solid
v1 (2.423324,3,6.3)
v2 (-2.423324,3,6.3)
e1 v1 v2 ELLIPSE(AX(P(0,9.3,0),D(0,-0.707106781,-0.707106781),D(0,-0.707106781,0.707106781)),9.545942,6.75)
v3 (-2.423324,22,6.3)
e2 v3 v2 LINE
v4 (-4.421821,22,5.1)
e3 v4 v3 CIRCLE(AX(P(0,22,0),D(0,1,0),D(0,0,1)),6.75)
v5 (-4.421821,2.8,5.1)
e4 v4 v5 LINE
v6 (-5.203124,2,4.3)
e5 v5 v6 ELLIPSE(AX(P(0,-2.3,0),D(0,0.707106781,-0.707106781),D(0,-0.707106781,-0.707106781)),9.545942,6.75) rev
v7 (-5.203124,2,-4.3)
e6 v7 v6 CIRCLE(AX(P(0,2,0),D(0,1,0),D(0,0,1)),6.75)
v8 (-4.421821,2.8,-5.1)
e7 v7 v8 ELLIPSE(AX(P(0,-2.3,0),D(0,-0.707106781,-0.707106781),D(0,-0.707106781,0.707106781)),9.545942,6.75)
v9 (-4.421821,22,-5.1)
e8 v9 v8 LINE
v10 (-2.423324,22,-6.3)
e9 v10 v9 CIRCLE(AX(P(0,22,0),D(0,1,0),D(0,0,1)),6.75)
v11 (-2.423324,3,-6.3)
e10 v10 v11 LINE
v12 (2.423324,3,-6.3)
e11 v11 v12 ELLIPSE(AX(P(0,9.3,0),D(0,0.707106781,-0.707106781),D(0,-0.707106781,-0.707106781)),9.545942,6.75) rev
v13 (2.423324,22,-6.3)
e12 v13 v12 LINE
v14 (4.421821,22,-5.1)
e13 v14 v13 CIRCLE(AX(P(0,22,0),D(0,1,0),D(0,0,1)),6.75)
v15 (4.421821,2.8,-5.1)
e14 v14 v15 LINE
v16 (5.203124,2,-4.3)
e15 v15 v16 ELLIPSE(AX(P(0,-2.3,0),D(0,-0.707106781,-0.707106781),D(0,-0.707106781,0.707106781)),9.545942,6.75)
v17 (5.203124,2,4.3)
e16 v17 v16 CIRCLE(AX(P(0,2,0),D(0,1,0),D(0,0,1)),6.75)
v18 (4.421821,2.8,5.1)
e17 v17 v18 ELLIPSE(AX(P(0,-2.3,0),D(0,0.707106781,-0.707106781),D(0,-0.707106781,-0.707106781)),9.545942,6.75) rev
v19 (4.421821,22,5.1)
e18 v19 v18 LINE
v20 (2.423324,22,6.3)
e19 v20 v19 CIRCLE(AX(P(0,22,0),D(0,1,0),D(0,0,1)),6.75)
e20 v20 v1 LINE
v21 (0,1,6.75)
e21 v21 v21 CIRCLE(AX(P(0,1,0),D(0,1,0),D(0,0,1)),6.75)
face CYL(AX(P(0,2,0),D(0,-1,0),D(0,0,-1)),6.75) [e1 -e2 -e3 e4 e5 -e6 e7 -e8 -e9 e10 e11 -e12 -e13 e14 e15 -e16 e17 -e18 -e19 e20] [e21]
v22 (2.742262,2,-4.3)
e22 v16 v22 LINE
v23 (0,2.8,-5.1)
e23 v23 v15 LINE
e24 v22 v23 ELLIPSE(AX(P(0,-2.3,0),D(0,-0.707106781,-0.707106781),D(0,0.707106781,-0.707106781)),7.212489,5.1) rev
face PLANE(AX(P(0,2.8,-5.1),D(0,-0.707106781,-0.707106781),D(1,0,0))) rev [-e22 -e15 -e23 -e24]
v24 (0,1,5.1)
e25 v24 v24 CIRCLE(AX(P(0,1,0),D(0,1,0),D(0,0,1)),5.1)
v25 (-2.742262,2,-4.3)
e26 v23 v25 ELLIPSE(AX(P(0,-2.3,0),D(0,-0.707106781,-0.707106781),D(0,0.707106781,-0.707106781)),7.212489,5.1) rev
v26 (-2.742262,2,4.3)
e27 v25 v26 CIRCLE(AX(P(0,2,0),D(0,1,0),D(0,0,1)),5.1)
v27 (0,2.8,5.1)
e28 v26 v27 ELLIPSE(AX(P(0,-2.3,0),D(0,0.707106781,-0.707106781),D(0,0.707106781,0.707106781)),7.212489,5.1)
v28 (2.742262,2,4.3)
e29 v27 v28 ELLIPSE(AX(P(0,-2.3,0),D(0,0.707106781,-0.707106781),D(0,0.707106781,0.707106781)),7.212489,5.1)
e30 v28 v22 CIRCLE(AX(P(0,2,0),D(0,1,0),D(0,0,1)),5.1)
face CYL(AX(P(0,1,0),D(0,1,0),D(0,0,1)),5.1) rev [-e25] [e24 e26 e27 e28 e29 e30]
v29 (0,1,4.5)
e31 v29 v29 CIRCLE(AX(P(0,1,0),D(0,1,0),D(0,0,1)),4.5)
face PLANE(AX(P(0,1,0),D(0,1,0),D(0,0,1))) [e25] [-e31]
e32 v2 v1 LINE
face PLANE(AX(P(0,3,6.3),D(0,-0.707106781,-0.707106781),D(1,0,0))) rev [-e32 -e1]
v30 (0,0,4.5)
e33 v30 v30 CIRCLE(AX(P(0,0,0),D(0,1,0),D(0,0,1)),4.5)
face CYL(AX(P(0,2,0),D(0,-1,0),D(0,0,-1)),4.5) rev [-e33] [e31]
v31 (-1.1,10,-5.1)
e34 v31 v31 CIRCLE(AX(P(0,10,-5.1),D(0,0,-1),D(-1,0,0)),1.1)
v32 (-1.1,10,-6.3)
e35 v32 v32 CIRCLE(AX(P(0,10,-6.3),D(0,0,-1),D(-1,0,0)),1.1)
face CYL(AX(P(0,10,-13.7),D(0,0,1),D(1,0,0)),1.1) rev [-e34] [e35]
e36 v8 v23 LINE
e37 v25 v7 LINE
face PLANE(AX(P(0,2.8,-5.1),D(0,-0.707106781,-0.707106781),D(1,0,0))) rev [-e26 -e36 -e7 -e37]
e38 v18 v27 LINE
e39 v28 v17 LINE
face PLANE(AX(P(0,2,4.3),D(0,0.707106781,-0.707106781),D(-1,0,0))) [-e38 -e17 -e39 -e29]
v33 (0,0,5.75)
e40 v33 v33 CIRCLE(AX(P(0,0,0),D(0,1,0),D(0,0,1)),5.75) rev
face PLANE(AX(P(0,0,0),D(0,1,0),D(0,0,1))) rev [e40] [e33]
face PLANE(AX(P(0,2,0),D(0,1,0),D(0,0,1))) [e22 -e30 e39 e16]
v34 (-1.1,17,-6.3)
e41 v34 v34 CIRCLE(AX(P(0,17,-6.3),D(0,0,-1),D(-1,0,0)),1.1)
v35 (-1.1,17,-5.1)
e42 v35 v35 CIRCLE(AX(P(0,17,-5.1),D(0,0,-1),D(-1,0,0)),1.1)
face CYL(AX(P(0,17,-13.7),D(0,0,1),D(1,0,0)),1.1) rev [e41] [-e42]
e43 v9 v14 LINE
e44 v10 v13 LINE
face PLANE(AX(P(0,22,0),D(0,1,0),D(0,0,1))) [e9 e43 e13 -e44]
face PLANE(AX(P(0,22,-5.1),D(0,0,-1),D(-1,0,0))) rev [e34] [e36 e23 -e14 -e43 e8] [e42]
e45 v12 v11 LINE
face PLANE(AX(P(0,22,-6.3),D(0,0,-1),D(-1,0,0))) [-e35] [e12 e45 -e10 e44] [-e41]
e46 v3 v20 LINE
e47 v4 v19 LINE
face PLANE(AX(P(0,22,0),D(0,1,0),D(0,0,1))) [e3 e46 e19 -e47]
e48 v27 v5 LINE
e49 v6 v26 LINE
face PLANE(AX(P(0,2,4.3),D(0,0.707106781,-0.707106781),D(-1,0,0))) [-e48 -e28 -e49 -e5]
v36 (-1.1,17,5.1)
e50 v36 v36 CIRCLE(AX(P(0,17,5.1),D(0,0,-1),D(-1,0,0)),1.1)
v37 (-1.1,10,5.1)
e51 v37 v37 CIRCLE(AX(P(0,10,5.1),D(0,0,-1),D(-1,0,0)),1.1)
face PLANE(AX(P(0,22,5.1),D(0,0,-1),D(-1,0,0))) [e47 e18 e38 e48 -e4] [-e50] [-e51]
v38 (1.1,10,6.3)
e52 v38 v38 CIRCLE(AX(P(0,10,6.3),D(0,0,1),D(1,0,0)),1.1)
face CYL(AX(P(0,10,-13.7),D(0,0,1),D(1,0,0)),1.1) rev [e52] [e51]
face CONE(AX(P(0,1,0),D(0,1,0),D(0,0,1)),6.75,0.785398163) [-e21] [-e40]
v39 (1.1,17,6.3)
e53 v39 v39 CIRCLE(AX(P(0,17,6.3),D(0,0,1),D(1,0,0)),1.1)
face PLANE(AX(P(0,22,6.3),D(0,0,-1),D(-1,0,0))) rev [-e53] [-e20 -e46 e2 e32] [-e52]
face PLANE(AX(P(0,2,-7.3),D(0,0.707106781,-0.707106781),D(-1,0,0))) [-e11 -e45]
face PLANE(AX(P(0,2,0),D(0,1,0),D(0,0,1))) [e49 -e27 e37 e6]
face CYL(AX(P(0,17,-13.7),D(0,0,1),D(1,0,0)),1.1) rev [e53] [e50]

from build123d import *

# Parameters (mm, degrees)
SKETCH_1_R          = 6.75
SKETCH_1_R_2        = 4.5
EXTRUDE_1_DEPTH     = 2
SKETCH_2_R          = 5.1000000000000005
CUT_EXTRUDE_1_DEPTH = 1
EXTRUDE_2_DEPTH     = 20
SKETCH_4_R          = 1.1
CUT_EXTRUDE_2_DEPTH = 20
CHAMFER_1_SIZE      = 1
CHAMFER_2_SIZE      = 1
CHAMFER_3_SIZE      = 0.8


with BuildPart() as part:
    # 草图1 → 凸台-拉伸1 (new body)
    with BuildSketch(Plane(origin=(0, 0, 0), x_dir=(1, 0, 0), z_dir=(0, 1, 0))):
        with Locations(Location((0, 0, 0), (0, 0, 270))):
            Circle(SKETCH_1_R)
        with Locations(Location((0, 0, 0), (0, 0, 270))):
            Circle(SKETCH_1_R_2, mode=Mode.SUBTRACT)
    extrude(amount=EXTRUDE_1_DEPTH)

    # 草图2 → 切除-拉伸1 (cut)
    with BuildSketch(Plane(origin=(0, 2, 0), x_dir=(1, 0, 0), z_dir=(0, 1, 0))):
        with Locations(Location((0, 0, 0), (0, 0, 270))):
            Circle(SKETCH_2_R)
    extrude(amount=-CUT_EXTRUDE_1_DEPTH, mode=Mode.SUBTRACT)

    # 草图3 → 凸台-拉伸2 (add)
    with BuildSketch(Plane(origin=(0, 2, 0), x_dir=(1, 0, 0), z_dir=(0, 1, 0))):
        with BuildLine():
            ThreePointArc((-2.4233241632105296, 6.299999999999999), (-3.4747665686142524, 5.786924683598426), (-4.421820891895102, 5.1))
            Line((-4.421820891895103, 5.1), (4.421820891895103, 5.1))
            ThreePointArc((4.421820891895103, 5.099999999999999), (3.4747665686142533, 5.786924683598425), (2.4233241632105287, 6.299999999999999))
            Line((2.4233241632105287, 6.299999999999999), (-2.4233241632105287, 6.299999999999999))
        make_face()
        with BuildLine():
            Line((4.421820891895103, -5.1), (-4.421820891895103, -5.1))
            ThreePointArc((-4.421820891895104, -5.099999999999999), (-3.4747665686142537, -5.786924683598424), (-2.4233241632105327, -6.299999999999998))
            Line((-2.4233241632105287, -6.299999999999999), (2.4233241632105287, -6.299999999999999))
            ThreePointArc((2.4233241632105305, -6.299999999999999), (3.4747665686142515, -5.786924683598426), (4.4218208918951, -5.100000000000002))
        make_face()
    extrude(amount=EXTRUDE_2_DEPTH)

    # 草图4 → 切除-拉伸2 (cut)
    with BuildSketch(Plane.XY.offset(6.299999999999999)):
        with Locations((0, 17)):
            Circle(SKETCH_4_R)
        with Locations((0, 10)):
            Circle(SKETCH_4_R)
    extrude(amount=-CUT_EXTRUDE_2_DEPTH, mode=Mode.SUBTRACT)

    # 倒角1
    chamfer_1_edges = [part.edges().sort_by_distance(p)[0] for p in [
        (2.07e-15, 0, -6.75),
    ]]
    chamfer(chamfer_1_edges, length=CHAMFER_1_SIZE)

    # 倒角2
    # the kernel refuses this chamfer: 1 mm, written as the material it adds along each edge
    with BuildSketch(Plane(origin=(-4.99500715117644, 2, 6.299999999999999), x_dir=(0, -0.02749587661058627, 0.9996219169112968), z_dir=(1, 0, 0))) as chamfer_2_piece_1_section:
        Polygon((CHAMFER_2_SIZE * 0.999621916911, -CHAMFER_2_SIZE * 0.0274958766106), (-CHAMFER_2_SIZE * 0.0274958766106, -CHAMFER_2_SIZE * 0.999621916911), (0, 0), align=None)
    chamfer_2_piece_1 = extrude(amount=9.99001430235288, mode=Mode.PRIVATE)
    chamfer_2_piece_1 = chamfer_2_piece_1 & Plane(origin=(0, 2.4270240962086875, 0), x_dir=(-1.8e-16, 0, 1), z_dir=(0, -1, 0)) * Cylinder(6.75, 24, mode=Mode.PRIVATE)
    add(chamfer_2_piece_1)
    with BuildSketch(Plane(origin=(4.99500715117644, 2, -6.299999999999999), x_dir=(0, -0.02749587661058627, -0.9996219169112968), z_dir=(-1, 0, 0))) as chamfer_2_piece_2_section:
        Polygon((CHAMFER_2_SIZE * 0.999621916911, -CHAMFER_2_SIZE * 0.0274958766106), (-CHAMFER_2_SIZE * 0.0274958766106, -CHAMFER_2_SIZE * 0.999621916911), (0, 0), align=None)
    chamfer_2_piece_2 = extrude(amount=9.99001430235288, mode=Mode.PRIVATE)
    chamfer_2_piece_2 = chamfer_2_piece_2 & Plane(origin=(0, 2.4270241038722706, 0), x_dir=(-1.8e-16, 0, 1), z_dir=(0, -1, 0)) * Cylinder(6.75, 24, mode=Mode.PRIVATE)
    add(chamfer_2_piece_2)

    # 倒角3
    # the kernel refuses this chamfer: 0.8 mm, written as the material it adds along each edge
    with BuildSketch(Plane(origin=(6.22e-15, 2, -5.1), x_dir=(0, 0.9996219169112968, -0.027495876610586285), z_dir=(1, 0, 0))) as chamfer_3_piece_1_section:
        Polygon((CHAMFER_3_SIZE * 0.999621916911, CHAMFER_3_SIZE * 0.0274958766106), (-CHAMFER_3_SIZE * 0.0274958766106, CHAMFER_3_SIZE * 0.999621916911), (0, 0), align=None)
    chamfer_3_piece_1 = extrude(amount=6.479167282267824, mode=Mode.PRIVATE)
    chamfer_3_piece_1 = chamfer_3_piece_1 & Plane(origin=(0, 2.278466401916116, 0), x_dir=(-1.8e-16, 0, 1), z_dir=(0, -1, 0)) * Cylinder(6.75, 17, mode=Mode.PRIVATE)
    chamfer_3_piece_1 = chamfer_3_piece_1 - Plane(origin=(0, 2.278466401916116, 0), x_dir=(-1.8e-16, 0, 1), z_dir=(0, 1, 0)) * Cylinder(5.1000000000000005, 17, mode=Mode.PRIVATE)
    add(chamfer_3_piece_1)
    with BuildSketch(Plane(origin=(-6.479167282267831, 2, -5.1), x_dir=(0, 0.9996219169112968, -0.027495876610586285), z_dir=(1, 0, 0))) as chamfer_3_piece_2_section:
        Polygon((CHAMFER_3_SIZE * 0.999621916911, CHAMFER_3_SIZE * 0.0274958766106), (-CHAMFER_3_SIZE * 0.0274958766106, CHAMFER_3_SIZE * 0.999621916911), (0, 0), align=None)
    chamfer_3_piece_2 = extrude(amount=6.479167282267837, mode=Mode.PRIVATE)
    chamfer_3_piece_2 = chamfer_3_piece_2 & Plane(origin=(0, 2.27846640235757, 0), x_dir=(-1.8e-16, 0, 1), z_dir=(0, -1, 0)) * Cylinder(6.75, 17, mode=Mode.PRIVATE)
    chamfer_3_piece_2 = chamfer_3_piece_2 - Plane(origin=(0, 2.27846640235757, 0), x_dir=(-1.8e-16, 0, 1), z_dir=(0, 1, 0)) * Cylinder(5.1000000000000005, 17, mode=Mode.PRIVATE)
    add(chamfer_3_piece_2)
    with BuildSketch(Plane(origin=(-8.9e-16, 2, 5.1), x_dir=(0, -0.027495876610586285, -0.9996219169112968), z_dir=(-1, 0, 0))) as chamfer_3_piece_3_section:
        Polygon((CHAMFER_3_SIZE * 0.999621916911, -CHAMFER_3_SIZE * 0.0274958766106), (-CHAMFER_3_SIZE * 0.0274958766106, -CHAMFER_3_SIZE * 0.999621916911), (0, 0), align=None)
    chamfer_3_piece_3 = extrude(amount=6.479167282267829, mode=Mode.PRIVATE)
    chamfer_3_piece_3 = chamfer_3_piece_3 & Plane(origin=(0, 2.2784664022483097, 0), x_dir=(-1.8e-16, 0, 1), z_dir=(0, -1, 0)) * Cylinder(6.75, 17, mode=Mode.PRIVATE)
    chamfer_3_piece_3 = chamfer_3_piece_3 - Plane(origin=(0, 2.2784664022483097, 0), x_dir=(-1.8e-16, 0, 1), z_dir=(0, 1, 0)) * Cylinder(5.1000000000000005, 17, mode=Mode.PRIVATE)
    add(chamfer_3_piece_3)
    with BuildSketch(Plane(origin=(6.479167282267831, 2, 5.1), x_dir=(0, -0.027495876610586285, -0.9996219169112968), z_dir=(-1, 0, 0))) as chamfer_3_piece_4_section:
        Polygon((CHAMFER_3_SIZE * 0.999621916911, -CHAMFER_3_SIZE * 0.0274958766106), (-CHAMFER_3_SIZE * 0.0274958766106, -CHAMFER_3_SIZE * 0.999621916911), (0, 0), align=None)
    chamfer_3_piece_4 = extrude(amount=6.479167282267832, mode=Mode.PRIVATE)
    chamfer_3_piece_4 = chamfer_3_piece_4 & Plane(origin=(0, 2.278466402305348, 0), x_dir=(-1.8e-16, 0, 1), z_dir=(0, -1, 0)) * Cylinder(6.75, 17, mode=Mode.PRIVATE)
    chamfer_3_piece_4 = chamfer_3_piece_4 - Plane(origin=(0, 2.278466402305348, 0), x_dir=(-1.8e-16, 0, 1), z_dir=(0, 1, 0)) * Cylinder(5.1000000000000005, 17, mode=Mode.PRIVATE)
    add(chamfer_3_piece_4)


solid = part.part
